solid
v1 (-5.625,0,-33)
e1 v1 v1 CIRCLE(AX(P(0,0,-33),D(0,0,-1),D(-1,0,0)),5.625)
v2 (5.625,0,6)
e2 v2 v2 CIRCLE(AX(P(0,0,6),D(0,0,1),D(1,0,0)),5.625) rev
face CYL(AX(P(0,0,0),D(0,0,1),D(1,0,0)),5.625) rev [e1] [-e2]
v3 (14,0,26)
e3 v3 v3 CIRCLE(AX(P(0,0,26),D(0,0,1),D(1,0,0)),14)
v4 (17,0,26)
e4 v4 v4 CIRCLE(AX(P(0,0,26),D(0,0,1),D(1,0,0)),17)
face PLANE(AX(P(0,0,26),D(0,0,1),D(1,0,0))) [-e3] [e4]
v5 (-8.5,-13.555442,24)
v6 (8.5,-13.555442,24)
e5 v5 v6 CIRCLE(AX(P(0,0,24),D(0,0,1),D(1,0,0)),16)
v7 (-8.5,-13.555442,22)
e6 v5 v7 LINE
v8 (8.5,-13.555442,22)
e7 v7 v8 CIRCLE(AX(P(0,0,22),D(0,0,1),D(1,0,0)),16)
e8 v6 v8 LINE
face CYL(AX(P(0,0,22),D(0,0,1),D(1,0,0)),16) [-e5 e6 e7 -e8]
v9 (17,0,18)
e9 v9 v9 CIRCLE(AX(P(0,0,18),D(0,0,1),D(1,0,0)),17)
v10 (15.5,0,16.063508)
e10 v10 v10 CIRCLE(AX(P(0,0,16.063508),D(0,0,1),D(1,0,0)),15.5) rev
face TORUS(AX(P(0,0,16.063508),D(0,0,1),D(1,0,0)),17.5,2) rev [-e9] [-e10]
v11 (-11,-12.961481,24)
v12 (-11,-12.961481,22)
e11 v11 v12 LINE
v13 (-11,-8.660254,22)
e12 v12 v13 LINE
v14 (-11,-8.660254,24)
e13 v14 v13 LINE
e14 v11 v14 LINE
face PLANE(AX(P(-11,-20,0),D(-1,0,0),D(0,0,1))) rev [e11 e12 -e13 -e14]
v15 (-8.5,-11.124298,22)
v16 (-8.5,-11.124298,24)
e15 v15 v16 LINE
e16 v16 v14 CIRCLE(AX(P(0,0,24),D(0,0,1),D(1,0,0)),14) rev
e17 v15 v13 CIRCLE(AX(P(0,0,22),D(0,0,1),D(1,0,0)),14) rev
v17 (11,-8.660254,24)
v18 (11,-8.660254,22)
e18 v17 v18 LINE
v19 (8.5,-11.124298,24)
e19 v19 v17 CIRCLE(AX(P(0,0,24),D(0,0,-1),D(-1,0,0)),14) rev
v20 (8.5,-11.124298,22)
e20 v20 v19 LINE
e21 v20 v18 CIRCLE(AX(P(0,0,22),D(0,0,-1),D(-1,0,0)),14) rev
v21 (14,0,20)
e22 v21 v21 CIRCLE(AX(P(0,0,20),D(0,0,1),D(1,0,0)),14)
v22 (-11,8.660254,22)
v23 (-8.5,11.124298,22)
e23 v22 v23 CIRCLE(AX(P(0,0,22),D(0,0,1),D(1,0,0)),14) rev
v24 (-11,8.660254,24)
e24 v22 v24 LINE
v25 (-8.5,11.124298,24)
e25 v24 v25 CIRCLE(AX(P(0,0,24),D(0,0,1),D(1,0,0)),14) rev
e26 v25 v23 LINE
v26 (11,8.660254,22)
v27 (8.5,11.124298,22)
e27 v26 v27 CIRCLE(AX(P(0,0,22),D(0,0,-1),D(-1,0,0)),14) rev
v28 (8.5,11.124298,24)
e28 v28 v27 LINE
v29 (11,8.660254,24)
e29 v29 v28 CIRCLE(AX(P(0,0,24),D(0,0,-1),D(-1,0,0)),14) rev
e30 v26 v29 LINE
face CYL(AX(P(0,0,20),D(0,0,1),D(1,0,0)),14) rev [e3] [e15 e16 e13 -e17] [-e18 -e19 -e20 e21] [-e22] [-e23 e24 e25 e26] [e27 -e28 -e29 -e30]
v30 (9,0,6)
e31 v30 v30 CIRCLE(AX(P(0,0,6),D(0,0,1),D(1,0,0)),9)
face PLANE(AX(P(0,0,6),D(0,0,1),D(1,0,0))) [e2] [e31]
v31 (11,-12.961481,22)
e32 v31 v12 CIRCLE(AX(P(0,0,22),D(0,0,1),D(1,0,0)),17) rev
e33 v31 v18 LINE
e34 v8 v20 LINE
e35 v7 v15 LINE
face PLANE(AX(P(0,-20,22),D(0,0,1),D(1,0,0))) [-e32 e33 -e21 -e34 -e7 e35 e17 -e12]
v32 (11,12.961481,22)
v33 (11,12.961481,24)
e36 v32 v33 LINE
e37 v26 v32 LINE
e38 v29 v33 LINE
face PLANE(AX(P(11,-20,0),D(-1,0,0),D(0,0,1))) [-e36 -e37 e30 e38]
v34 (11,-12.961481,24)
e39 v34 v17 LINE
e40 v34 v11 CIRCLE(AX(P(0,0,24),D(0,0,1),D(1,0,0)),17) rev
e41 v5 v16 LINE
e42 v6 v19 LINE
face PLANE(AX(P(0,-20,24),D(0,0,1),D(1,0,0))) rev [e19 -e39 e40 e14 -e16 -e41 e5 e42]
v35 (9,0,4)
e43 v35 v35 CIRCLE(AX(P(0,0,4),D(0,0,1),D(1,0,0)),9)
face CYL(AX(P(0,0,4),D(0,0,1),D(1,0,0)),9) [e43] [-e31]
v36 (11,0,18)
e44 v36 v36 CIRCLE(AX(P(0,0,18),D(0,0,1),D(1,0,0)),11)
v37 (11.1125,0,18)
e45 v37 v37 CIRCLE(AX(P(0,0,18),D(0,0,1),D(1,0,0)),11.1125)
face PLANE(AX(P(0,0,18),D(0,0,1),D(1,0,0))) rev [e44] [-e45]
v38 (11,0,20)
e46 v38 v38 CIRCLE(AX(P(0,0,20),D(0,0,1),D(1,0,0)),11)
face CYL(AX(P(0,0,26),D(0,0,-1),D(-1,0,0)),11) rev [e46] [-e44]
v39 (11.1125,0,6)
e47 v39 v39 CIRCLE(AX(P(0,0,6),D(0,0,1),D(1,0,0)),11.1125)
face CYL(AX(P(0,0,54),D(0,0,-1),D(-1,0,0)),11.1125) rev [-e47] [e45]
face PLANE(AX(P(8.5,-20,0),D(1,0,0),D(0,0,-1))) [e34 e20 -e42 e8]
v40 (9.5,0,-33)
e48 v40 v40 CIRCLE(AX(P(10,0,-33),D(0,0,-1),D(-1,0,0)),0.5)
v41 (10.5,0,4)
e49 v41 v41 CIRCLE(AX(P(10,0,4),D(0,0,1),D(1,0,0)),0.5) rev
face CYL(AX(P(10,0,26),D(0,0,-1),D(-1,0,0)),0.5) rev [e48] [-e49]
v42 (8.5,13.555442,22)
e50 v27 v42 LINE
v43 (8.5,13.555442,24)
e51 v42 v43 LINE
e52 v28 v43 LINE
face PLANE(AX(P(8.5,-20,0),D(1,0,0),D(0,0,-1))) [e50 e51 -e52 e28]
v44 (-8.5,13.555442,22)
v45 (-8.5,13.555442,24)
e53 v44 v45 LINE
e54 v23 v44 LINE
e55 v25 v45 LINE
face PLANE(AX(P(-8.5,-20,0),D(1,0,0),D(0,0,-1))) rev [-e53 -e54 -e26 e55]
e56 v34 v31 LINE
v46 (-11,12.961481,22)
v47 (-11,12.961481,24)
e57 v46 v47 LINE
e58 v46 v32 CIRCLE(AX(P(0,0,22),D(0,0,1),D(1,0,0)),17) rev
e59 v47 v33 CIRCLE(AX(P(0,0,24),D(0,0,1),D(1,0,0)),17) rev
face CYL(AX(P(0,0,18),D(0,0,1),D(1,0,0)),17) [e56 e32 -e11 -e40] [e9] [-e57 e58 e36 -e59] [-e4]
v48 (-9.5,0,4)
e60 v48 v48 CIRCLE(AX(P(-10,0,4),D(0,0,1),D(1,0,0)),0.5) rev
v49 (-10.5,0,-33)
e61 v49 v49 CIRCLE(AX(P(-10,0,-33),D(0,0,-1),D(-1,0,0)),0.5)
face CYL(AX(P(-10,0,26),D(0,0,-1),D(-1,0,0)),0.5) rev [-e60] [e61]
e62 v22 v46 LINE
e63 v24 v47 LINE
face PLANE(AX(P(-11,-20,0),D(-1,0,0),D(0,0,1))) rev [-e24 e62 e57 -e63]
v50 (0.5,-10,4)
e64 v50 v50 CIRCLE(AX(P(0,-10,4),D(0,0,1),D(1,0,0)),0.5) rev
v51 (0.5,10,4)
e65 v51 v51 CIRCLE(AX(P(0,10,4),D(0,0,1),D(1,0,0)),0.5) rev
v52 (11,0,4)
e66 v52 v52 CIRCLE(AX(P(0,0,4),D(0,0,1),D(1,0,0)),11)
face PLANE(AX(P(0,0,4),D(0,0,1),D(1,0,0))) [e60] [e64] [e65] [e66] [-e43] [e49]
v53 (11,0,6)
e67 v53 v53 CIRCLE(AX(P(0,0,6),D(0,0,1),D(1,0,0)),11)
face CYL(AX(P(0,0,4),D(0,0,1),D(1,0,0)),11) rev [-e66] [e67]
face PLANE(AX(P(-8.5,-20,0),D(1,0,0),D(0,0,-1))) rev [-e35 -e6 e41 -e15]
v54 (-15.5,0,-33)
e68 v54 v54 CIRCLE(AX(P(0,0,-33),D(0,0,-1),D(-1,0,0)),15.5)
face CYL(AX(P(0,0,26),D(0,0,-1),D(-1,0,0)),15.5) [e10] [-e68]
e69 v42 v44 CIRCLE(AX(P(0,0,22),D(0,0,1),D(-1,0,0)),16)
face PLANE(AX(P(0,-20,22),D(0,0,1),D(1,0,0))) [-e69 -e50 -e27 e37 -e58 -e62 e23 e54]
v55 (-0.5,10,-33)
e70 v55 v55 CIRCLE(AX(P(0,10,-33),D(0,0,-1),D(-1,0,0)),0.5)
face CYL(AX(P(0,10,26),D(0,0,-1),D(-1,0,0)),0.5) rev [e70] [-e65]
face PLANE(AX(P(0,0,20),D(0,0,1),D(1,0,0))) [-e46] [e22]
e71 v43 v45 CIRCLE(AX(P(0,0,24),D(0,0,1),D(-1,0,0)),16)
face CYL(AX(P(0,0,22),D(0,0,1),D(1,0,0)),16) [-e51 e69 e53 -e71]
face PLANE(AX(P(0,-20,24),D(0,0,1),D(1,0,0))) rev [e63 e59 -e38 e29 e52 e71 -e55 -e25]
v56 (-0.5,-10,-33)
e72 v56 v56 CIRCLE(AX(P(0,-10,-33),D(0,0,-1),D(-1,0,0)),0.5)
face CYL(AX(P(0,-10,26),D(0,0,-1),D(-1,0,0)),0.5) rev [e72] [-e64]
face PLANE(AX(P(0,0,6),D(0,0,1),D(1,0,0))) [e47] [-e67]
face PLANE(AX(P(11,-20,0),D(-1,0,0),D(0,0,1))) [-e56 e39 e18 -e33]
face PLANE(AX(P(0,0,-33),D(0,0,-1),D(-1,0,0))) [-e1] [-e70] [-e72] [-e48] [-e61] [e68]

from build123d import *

# Parameters (mm, degrees)
SKETCH1_R                = 15.5
BOSS_EXTRUDE5_DEPTH      = 26
SKETCH3_R                = 5.625
CUT_EXTRUDE2_DEPTH       = 35.007352146
CUT_EXTRUDE3_DEPTH       = 28
CUT_EXTRUDE3_DEPTH_BACK  = 20
SKETCH4_R                = 11.1125
CUT_EXTRUDE6_START       = 6
SKETCH7_R                = 11
SKETCH7_R_2              = 9
CUT_EXTRUDE6_DEPTH       = 2
BOSS_EXTRUDE8_DEPTH      = 6
BOSS_EXTRUDE8_DEPTH_BACK = 2
BOSS_EXTRUDE8_START      = 20
SKETCH12_R               = 17
CUT_EXTRUDE10_START      = 18
SKETCH13_R               = 11
CUT_EXTRUDE10_DEPTH      = 18.411862419
FILLET2_R                = 2
CUT_EXTRUDE11_START      = 26
SKETCH14_R               = 14
CUT_EXTRUDE11_DEPTH      = 6
SKETCH15_R               = 0.5
CUT_EXTRUDE14_DEPTH      = 36.411862419
SKETCH18_W               = 2.5
SKETCH18_H               = 2
CUT_EXTRUDE15_DEPTH      = 20
CUT_EXTRUDE16_DEPTH      = 2
BOSS_EXTRUDE9_START      = 33
SKETCH26_R               = 15.5
SKETCH26_R_2             = 5.625
SKETCH26_R_3             = 0.5
BOSS_EXTRUDE9_DEPTH      = 33


with BuildPart() as part:
    # Sketch1 → Boss-Extrude5 (new body)
    with BuildSketch(Plane.XY):
        Circle(SKETCH1_R)
    extrude(amount=BOSS_EXTRUDE5_DEPTH)

    # Sketch3 → Cut-Extrude2 (cut, through all)
    with BuildSketch(Plane.XY.offset(26)):
        Circle(SKETCH3_R)
    extrude(amount=-CUT_EXTRUDE2_DEPTH, mode=Mode.SUBTRACT)

    # Sketch4 → Cut-Extrude3 (cut, two sides: drawn at the far end of the back side and taken through both)
    with BuildSketch(Plane.XY.offset(26).offset(-CUT_EXTRUDE3_DEPTH_BACK)):
        Circle(SKETCH4_R)
    extrude(amount=CUT_EXTRUDE3_DEPTH + CUT_EXTRUDE3_DEPTH_BACK, mode=Mode.SUBTRACT)

    # Sketch7 → Cut-Extrude6 (cut)
    with BuildSketch(Plane.XY.offset(CUT_EXTRUDE6_START)):
        Circle(SKETCH7_R)
        Circle(SKETCH7_R_2, mode=Mode.SUBTRACT)
    extrude(amount=-CUT_EXTRUDE6_DEPTH, mode=Mode.SUBTRACT)

    # Sketch12 → Boss-Extrude8 (add, two sides: drawn at the far end of the back side and taken through both)
    with BuildSketch(Plane.XY.offset(BOSS_EXTRUDE8_START - BOSS_EXTRUDE8_DEPTH_BACK)):
        Circle(SKETCH12_R)
    extrude(amount=BOSS_EXTRUDE8_DEPTH + BOSS_EXTRUDE8_DEPTH_BACK)

    # Sketch13 → Cut-Extrude10 (cut, through all)
    with BuildSketch(Plane.XY.offset(CUT_EXTRUDE10_START)):
        Circle(SKETCH13_R)
    extrude(amount=CUT_EXTRUDE10_DEPTH, mode=Mode.SUBTRACT)

    # Fillet2
    # the kernel refuses this fillet: 2 mm, written as the material it adds along each edge
    with BuildSketch(Plane(origin=(0, 0, 18), x_dir=(1, 0, 0), z_dir=(0, 1, 0))) as fillet2_piece_1:
        with BuildLine():
            CenterArc((17.5, 1.936491673), FILLET2_R, 180, 75.522487814)
            Line((17, 0), (16.99, -0.038729833))
            ThreePointArc((16.99, -0.038729833), (16.25, -0.04), (15.5, -0.04))
            Line((15.5, -0.04), (15.46, 0))
            Line((15.46, 0), (15.46, 1.936491673))
            Line((15.46, 1.936491673), (15.5, 1.936491673))
        make_face()
    revolve(axis=Axis((0, 0, 18), (0, 0, -1)))

    # Sketch14 → Cut-Extrude11 (cut)
    with BuildSketch(Plane.XY.offset(CUT_EXTRUDE11_START)):
        Circle(SKETCH14_R)
    extrude(amount=-CUT_EXTRUDE11_DEPTH, mode=Mode.SUBTRACT)

    # Sketch15 → Cut-Extrude14 (cut, through all)
    with BuildSketch(Plane.XY):
        with Locations((0, 10)):
            Circle(SKETCH15_R)
        with Locations((0, -10)):
            Circle(SKETCH15_R)
        with Locations((10, 0)):
            Circle(SKETCH15_R)
        with Locations((-10, 0)):
            Circle(SKETCH15_R)
    extrude(amount=CUT_EXTRUDE14_DEPTH, mode=Mode.SUBTRACT)

    # Sketch18 → Cut-Extrude15 (cut, symmetric)
    with BuildSketch(Plane(origin=(0, 0, 0), x_dir=(1, 0, 0), z_dir=(0, 1, 0))):
        with Locations((-9.75, -23)):
            Rectangle(SKETCH18_W, SKETCH18_H)
        with Locations((9.75, -23)):
            Rectangle(SKETCH18_W, SKETCH18_H)
    extrude(amount=CUT_EXTRUDE15_DEPTH, both=True, mode=Mode.SUBTRACT)

    # Sketch23 → Cut-Extrude16 (cut)
    with BuildSketch(Plane(origin=(0, 0, 24), x_dir=(-1, 0, 0), z_dir=(0, 0, -1))):
        with BuildLine():
            Line((9.719197711, 13.947659153), (9.147480199, 13.127208615))
            ThreePointArc((9.147480199, 13.127208615), (0, 16), (-9.147480199, 13.127208615))
            Line((-9.147480199, 13.127208615), (-9.719197711, 13.947659153))
            ThreePointArc((-9.719197711, 13.947659153), (0, 17), (9.719197711, 13.947659153))
        make_face()
        with BuildLine():
            Line((-9.147480199, -13.127208615), (-9.719197711, -13.947659153))
            ThreePointArc((-9.719197711, -13.947659153), (0, -17), (9.719197711, -13.947659153))
            Line((9.719197711, -13.947659153), (9.147480199, -13.127208615))
            ThreePointArc((9.147480199, -13.127208615), (0, -16), (-9.147480199, -13.127208615))
        make_face()
    extrude(amount=CUT_EXTRUDE16_DEPTH, mode=Mode.SUBTRACT)

    # Sketch26 → Boss-Extrude9 (add)
    with BuildSketch(Plane(origin=(0, 0, 0), x_dir=(-1, 0, 0), z_dir=(0, 0, -1)).offset(BOSS_EXTRUDE9_START)):
        Circle(SKETCH26_R)
        with Locations(Location((0, 0, 0), (0, 0, 180))):
            Circle(SKETCH26_R_2, mode=Mode.SUBTRACT)
        with Locations((-10, 0)):
            Circle(SKETCH26_R_3, mode=Mode.SUBTRACT)
        with Locations((0, 10)):
            Circle(SKETCH26_R_3, mode=Mode.SUBTRACT)
        with Locations((10, 0)):
            Circle(SKETCH26_R_3, mode=Mode.SUBTRACT)
        with Locations((0, -10)):
            Circle(SKETCH26_R_3, mode=Mode.SUBTRACT)
    extrude(amount=-BOSS_EXTRUDE9_DEPTH)


solid = part.part
